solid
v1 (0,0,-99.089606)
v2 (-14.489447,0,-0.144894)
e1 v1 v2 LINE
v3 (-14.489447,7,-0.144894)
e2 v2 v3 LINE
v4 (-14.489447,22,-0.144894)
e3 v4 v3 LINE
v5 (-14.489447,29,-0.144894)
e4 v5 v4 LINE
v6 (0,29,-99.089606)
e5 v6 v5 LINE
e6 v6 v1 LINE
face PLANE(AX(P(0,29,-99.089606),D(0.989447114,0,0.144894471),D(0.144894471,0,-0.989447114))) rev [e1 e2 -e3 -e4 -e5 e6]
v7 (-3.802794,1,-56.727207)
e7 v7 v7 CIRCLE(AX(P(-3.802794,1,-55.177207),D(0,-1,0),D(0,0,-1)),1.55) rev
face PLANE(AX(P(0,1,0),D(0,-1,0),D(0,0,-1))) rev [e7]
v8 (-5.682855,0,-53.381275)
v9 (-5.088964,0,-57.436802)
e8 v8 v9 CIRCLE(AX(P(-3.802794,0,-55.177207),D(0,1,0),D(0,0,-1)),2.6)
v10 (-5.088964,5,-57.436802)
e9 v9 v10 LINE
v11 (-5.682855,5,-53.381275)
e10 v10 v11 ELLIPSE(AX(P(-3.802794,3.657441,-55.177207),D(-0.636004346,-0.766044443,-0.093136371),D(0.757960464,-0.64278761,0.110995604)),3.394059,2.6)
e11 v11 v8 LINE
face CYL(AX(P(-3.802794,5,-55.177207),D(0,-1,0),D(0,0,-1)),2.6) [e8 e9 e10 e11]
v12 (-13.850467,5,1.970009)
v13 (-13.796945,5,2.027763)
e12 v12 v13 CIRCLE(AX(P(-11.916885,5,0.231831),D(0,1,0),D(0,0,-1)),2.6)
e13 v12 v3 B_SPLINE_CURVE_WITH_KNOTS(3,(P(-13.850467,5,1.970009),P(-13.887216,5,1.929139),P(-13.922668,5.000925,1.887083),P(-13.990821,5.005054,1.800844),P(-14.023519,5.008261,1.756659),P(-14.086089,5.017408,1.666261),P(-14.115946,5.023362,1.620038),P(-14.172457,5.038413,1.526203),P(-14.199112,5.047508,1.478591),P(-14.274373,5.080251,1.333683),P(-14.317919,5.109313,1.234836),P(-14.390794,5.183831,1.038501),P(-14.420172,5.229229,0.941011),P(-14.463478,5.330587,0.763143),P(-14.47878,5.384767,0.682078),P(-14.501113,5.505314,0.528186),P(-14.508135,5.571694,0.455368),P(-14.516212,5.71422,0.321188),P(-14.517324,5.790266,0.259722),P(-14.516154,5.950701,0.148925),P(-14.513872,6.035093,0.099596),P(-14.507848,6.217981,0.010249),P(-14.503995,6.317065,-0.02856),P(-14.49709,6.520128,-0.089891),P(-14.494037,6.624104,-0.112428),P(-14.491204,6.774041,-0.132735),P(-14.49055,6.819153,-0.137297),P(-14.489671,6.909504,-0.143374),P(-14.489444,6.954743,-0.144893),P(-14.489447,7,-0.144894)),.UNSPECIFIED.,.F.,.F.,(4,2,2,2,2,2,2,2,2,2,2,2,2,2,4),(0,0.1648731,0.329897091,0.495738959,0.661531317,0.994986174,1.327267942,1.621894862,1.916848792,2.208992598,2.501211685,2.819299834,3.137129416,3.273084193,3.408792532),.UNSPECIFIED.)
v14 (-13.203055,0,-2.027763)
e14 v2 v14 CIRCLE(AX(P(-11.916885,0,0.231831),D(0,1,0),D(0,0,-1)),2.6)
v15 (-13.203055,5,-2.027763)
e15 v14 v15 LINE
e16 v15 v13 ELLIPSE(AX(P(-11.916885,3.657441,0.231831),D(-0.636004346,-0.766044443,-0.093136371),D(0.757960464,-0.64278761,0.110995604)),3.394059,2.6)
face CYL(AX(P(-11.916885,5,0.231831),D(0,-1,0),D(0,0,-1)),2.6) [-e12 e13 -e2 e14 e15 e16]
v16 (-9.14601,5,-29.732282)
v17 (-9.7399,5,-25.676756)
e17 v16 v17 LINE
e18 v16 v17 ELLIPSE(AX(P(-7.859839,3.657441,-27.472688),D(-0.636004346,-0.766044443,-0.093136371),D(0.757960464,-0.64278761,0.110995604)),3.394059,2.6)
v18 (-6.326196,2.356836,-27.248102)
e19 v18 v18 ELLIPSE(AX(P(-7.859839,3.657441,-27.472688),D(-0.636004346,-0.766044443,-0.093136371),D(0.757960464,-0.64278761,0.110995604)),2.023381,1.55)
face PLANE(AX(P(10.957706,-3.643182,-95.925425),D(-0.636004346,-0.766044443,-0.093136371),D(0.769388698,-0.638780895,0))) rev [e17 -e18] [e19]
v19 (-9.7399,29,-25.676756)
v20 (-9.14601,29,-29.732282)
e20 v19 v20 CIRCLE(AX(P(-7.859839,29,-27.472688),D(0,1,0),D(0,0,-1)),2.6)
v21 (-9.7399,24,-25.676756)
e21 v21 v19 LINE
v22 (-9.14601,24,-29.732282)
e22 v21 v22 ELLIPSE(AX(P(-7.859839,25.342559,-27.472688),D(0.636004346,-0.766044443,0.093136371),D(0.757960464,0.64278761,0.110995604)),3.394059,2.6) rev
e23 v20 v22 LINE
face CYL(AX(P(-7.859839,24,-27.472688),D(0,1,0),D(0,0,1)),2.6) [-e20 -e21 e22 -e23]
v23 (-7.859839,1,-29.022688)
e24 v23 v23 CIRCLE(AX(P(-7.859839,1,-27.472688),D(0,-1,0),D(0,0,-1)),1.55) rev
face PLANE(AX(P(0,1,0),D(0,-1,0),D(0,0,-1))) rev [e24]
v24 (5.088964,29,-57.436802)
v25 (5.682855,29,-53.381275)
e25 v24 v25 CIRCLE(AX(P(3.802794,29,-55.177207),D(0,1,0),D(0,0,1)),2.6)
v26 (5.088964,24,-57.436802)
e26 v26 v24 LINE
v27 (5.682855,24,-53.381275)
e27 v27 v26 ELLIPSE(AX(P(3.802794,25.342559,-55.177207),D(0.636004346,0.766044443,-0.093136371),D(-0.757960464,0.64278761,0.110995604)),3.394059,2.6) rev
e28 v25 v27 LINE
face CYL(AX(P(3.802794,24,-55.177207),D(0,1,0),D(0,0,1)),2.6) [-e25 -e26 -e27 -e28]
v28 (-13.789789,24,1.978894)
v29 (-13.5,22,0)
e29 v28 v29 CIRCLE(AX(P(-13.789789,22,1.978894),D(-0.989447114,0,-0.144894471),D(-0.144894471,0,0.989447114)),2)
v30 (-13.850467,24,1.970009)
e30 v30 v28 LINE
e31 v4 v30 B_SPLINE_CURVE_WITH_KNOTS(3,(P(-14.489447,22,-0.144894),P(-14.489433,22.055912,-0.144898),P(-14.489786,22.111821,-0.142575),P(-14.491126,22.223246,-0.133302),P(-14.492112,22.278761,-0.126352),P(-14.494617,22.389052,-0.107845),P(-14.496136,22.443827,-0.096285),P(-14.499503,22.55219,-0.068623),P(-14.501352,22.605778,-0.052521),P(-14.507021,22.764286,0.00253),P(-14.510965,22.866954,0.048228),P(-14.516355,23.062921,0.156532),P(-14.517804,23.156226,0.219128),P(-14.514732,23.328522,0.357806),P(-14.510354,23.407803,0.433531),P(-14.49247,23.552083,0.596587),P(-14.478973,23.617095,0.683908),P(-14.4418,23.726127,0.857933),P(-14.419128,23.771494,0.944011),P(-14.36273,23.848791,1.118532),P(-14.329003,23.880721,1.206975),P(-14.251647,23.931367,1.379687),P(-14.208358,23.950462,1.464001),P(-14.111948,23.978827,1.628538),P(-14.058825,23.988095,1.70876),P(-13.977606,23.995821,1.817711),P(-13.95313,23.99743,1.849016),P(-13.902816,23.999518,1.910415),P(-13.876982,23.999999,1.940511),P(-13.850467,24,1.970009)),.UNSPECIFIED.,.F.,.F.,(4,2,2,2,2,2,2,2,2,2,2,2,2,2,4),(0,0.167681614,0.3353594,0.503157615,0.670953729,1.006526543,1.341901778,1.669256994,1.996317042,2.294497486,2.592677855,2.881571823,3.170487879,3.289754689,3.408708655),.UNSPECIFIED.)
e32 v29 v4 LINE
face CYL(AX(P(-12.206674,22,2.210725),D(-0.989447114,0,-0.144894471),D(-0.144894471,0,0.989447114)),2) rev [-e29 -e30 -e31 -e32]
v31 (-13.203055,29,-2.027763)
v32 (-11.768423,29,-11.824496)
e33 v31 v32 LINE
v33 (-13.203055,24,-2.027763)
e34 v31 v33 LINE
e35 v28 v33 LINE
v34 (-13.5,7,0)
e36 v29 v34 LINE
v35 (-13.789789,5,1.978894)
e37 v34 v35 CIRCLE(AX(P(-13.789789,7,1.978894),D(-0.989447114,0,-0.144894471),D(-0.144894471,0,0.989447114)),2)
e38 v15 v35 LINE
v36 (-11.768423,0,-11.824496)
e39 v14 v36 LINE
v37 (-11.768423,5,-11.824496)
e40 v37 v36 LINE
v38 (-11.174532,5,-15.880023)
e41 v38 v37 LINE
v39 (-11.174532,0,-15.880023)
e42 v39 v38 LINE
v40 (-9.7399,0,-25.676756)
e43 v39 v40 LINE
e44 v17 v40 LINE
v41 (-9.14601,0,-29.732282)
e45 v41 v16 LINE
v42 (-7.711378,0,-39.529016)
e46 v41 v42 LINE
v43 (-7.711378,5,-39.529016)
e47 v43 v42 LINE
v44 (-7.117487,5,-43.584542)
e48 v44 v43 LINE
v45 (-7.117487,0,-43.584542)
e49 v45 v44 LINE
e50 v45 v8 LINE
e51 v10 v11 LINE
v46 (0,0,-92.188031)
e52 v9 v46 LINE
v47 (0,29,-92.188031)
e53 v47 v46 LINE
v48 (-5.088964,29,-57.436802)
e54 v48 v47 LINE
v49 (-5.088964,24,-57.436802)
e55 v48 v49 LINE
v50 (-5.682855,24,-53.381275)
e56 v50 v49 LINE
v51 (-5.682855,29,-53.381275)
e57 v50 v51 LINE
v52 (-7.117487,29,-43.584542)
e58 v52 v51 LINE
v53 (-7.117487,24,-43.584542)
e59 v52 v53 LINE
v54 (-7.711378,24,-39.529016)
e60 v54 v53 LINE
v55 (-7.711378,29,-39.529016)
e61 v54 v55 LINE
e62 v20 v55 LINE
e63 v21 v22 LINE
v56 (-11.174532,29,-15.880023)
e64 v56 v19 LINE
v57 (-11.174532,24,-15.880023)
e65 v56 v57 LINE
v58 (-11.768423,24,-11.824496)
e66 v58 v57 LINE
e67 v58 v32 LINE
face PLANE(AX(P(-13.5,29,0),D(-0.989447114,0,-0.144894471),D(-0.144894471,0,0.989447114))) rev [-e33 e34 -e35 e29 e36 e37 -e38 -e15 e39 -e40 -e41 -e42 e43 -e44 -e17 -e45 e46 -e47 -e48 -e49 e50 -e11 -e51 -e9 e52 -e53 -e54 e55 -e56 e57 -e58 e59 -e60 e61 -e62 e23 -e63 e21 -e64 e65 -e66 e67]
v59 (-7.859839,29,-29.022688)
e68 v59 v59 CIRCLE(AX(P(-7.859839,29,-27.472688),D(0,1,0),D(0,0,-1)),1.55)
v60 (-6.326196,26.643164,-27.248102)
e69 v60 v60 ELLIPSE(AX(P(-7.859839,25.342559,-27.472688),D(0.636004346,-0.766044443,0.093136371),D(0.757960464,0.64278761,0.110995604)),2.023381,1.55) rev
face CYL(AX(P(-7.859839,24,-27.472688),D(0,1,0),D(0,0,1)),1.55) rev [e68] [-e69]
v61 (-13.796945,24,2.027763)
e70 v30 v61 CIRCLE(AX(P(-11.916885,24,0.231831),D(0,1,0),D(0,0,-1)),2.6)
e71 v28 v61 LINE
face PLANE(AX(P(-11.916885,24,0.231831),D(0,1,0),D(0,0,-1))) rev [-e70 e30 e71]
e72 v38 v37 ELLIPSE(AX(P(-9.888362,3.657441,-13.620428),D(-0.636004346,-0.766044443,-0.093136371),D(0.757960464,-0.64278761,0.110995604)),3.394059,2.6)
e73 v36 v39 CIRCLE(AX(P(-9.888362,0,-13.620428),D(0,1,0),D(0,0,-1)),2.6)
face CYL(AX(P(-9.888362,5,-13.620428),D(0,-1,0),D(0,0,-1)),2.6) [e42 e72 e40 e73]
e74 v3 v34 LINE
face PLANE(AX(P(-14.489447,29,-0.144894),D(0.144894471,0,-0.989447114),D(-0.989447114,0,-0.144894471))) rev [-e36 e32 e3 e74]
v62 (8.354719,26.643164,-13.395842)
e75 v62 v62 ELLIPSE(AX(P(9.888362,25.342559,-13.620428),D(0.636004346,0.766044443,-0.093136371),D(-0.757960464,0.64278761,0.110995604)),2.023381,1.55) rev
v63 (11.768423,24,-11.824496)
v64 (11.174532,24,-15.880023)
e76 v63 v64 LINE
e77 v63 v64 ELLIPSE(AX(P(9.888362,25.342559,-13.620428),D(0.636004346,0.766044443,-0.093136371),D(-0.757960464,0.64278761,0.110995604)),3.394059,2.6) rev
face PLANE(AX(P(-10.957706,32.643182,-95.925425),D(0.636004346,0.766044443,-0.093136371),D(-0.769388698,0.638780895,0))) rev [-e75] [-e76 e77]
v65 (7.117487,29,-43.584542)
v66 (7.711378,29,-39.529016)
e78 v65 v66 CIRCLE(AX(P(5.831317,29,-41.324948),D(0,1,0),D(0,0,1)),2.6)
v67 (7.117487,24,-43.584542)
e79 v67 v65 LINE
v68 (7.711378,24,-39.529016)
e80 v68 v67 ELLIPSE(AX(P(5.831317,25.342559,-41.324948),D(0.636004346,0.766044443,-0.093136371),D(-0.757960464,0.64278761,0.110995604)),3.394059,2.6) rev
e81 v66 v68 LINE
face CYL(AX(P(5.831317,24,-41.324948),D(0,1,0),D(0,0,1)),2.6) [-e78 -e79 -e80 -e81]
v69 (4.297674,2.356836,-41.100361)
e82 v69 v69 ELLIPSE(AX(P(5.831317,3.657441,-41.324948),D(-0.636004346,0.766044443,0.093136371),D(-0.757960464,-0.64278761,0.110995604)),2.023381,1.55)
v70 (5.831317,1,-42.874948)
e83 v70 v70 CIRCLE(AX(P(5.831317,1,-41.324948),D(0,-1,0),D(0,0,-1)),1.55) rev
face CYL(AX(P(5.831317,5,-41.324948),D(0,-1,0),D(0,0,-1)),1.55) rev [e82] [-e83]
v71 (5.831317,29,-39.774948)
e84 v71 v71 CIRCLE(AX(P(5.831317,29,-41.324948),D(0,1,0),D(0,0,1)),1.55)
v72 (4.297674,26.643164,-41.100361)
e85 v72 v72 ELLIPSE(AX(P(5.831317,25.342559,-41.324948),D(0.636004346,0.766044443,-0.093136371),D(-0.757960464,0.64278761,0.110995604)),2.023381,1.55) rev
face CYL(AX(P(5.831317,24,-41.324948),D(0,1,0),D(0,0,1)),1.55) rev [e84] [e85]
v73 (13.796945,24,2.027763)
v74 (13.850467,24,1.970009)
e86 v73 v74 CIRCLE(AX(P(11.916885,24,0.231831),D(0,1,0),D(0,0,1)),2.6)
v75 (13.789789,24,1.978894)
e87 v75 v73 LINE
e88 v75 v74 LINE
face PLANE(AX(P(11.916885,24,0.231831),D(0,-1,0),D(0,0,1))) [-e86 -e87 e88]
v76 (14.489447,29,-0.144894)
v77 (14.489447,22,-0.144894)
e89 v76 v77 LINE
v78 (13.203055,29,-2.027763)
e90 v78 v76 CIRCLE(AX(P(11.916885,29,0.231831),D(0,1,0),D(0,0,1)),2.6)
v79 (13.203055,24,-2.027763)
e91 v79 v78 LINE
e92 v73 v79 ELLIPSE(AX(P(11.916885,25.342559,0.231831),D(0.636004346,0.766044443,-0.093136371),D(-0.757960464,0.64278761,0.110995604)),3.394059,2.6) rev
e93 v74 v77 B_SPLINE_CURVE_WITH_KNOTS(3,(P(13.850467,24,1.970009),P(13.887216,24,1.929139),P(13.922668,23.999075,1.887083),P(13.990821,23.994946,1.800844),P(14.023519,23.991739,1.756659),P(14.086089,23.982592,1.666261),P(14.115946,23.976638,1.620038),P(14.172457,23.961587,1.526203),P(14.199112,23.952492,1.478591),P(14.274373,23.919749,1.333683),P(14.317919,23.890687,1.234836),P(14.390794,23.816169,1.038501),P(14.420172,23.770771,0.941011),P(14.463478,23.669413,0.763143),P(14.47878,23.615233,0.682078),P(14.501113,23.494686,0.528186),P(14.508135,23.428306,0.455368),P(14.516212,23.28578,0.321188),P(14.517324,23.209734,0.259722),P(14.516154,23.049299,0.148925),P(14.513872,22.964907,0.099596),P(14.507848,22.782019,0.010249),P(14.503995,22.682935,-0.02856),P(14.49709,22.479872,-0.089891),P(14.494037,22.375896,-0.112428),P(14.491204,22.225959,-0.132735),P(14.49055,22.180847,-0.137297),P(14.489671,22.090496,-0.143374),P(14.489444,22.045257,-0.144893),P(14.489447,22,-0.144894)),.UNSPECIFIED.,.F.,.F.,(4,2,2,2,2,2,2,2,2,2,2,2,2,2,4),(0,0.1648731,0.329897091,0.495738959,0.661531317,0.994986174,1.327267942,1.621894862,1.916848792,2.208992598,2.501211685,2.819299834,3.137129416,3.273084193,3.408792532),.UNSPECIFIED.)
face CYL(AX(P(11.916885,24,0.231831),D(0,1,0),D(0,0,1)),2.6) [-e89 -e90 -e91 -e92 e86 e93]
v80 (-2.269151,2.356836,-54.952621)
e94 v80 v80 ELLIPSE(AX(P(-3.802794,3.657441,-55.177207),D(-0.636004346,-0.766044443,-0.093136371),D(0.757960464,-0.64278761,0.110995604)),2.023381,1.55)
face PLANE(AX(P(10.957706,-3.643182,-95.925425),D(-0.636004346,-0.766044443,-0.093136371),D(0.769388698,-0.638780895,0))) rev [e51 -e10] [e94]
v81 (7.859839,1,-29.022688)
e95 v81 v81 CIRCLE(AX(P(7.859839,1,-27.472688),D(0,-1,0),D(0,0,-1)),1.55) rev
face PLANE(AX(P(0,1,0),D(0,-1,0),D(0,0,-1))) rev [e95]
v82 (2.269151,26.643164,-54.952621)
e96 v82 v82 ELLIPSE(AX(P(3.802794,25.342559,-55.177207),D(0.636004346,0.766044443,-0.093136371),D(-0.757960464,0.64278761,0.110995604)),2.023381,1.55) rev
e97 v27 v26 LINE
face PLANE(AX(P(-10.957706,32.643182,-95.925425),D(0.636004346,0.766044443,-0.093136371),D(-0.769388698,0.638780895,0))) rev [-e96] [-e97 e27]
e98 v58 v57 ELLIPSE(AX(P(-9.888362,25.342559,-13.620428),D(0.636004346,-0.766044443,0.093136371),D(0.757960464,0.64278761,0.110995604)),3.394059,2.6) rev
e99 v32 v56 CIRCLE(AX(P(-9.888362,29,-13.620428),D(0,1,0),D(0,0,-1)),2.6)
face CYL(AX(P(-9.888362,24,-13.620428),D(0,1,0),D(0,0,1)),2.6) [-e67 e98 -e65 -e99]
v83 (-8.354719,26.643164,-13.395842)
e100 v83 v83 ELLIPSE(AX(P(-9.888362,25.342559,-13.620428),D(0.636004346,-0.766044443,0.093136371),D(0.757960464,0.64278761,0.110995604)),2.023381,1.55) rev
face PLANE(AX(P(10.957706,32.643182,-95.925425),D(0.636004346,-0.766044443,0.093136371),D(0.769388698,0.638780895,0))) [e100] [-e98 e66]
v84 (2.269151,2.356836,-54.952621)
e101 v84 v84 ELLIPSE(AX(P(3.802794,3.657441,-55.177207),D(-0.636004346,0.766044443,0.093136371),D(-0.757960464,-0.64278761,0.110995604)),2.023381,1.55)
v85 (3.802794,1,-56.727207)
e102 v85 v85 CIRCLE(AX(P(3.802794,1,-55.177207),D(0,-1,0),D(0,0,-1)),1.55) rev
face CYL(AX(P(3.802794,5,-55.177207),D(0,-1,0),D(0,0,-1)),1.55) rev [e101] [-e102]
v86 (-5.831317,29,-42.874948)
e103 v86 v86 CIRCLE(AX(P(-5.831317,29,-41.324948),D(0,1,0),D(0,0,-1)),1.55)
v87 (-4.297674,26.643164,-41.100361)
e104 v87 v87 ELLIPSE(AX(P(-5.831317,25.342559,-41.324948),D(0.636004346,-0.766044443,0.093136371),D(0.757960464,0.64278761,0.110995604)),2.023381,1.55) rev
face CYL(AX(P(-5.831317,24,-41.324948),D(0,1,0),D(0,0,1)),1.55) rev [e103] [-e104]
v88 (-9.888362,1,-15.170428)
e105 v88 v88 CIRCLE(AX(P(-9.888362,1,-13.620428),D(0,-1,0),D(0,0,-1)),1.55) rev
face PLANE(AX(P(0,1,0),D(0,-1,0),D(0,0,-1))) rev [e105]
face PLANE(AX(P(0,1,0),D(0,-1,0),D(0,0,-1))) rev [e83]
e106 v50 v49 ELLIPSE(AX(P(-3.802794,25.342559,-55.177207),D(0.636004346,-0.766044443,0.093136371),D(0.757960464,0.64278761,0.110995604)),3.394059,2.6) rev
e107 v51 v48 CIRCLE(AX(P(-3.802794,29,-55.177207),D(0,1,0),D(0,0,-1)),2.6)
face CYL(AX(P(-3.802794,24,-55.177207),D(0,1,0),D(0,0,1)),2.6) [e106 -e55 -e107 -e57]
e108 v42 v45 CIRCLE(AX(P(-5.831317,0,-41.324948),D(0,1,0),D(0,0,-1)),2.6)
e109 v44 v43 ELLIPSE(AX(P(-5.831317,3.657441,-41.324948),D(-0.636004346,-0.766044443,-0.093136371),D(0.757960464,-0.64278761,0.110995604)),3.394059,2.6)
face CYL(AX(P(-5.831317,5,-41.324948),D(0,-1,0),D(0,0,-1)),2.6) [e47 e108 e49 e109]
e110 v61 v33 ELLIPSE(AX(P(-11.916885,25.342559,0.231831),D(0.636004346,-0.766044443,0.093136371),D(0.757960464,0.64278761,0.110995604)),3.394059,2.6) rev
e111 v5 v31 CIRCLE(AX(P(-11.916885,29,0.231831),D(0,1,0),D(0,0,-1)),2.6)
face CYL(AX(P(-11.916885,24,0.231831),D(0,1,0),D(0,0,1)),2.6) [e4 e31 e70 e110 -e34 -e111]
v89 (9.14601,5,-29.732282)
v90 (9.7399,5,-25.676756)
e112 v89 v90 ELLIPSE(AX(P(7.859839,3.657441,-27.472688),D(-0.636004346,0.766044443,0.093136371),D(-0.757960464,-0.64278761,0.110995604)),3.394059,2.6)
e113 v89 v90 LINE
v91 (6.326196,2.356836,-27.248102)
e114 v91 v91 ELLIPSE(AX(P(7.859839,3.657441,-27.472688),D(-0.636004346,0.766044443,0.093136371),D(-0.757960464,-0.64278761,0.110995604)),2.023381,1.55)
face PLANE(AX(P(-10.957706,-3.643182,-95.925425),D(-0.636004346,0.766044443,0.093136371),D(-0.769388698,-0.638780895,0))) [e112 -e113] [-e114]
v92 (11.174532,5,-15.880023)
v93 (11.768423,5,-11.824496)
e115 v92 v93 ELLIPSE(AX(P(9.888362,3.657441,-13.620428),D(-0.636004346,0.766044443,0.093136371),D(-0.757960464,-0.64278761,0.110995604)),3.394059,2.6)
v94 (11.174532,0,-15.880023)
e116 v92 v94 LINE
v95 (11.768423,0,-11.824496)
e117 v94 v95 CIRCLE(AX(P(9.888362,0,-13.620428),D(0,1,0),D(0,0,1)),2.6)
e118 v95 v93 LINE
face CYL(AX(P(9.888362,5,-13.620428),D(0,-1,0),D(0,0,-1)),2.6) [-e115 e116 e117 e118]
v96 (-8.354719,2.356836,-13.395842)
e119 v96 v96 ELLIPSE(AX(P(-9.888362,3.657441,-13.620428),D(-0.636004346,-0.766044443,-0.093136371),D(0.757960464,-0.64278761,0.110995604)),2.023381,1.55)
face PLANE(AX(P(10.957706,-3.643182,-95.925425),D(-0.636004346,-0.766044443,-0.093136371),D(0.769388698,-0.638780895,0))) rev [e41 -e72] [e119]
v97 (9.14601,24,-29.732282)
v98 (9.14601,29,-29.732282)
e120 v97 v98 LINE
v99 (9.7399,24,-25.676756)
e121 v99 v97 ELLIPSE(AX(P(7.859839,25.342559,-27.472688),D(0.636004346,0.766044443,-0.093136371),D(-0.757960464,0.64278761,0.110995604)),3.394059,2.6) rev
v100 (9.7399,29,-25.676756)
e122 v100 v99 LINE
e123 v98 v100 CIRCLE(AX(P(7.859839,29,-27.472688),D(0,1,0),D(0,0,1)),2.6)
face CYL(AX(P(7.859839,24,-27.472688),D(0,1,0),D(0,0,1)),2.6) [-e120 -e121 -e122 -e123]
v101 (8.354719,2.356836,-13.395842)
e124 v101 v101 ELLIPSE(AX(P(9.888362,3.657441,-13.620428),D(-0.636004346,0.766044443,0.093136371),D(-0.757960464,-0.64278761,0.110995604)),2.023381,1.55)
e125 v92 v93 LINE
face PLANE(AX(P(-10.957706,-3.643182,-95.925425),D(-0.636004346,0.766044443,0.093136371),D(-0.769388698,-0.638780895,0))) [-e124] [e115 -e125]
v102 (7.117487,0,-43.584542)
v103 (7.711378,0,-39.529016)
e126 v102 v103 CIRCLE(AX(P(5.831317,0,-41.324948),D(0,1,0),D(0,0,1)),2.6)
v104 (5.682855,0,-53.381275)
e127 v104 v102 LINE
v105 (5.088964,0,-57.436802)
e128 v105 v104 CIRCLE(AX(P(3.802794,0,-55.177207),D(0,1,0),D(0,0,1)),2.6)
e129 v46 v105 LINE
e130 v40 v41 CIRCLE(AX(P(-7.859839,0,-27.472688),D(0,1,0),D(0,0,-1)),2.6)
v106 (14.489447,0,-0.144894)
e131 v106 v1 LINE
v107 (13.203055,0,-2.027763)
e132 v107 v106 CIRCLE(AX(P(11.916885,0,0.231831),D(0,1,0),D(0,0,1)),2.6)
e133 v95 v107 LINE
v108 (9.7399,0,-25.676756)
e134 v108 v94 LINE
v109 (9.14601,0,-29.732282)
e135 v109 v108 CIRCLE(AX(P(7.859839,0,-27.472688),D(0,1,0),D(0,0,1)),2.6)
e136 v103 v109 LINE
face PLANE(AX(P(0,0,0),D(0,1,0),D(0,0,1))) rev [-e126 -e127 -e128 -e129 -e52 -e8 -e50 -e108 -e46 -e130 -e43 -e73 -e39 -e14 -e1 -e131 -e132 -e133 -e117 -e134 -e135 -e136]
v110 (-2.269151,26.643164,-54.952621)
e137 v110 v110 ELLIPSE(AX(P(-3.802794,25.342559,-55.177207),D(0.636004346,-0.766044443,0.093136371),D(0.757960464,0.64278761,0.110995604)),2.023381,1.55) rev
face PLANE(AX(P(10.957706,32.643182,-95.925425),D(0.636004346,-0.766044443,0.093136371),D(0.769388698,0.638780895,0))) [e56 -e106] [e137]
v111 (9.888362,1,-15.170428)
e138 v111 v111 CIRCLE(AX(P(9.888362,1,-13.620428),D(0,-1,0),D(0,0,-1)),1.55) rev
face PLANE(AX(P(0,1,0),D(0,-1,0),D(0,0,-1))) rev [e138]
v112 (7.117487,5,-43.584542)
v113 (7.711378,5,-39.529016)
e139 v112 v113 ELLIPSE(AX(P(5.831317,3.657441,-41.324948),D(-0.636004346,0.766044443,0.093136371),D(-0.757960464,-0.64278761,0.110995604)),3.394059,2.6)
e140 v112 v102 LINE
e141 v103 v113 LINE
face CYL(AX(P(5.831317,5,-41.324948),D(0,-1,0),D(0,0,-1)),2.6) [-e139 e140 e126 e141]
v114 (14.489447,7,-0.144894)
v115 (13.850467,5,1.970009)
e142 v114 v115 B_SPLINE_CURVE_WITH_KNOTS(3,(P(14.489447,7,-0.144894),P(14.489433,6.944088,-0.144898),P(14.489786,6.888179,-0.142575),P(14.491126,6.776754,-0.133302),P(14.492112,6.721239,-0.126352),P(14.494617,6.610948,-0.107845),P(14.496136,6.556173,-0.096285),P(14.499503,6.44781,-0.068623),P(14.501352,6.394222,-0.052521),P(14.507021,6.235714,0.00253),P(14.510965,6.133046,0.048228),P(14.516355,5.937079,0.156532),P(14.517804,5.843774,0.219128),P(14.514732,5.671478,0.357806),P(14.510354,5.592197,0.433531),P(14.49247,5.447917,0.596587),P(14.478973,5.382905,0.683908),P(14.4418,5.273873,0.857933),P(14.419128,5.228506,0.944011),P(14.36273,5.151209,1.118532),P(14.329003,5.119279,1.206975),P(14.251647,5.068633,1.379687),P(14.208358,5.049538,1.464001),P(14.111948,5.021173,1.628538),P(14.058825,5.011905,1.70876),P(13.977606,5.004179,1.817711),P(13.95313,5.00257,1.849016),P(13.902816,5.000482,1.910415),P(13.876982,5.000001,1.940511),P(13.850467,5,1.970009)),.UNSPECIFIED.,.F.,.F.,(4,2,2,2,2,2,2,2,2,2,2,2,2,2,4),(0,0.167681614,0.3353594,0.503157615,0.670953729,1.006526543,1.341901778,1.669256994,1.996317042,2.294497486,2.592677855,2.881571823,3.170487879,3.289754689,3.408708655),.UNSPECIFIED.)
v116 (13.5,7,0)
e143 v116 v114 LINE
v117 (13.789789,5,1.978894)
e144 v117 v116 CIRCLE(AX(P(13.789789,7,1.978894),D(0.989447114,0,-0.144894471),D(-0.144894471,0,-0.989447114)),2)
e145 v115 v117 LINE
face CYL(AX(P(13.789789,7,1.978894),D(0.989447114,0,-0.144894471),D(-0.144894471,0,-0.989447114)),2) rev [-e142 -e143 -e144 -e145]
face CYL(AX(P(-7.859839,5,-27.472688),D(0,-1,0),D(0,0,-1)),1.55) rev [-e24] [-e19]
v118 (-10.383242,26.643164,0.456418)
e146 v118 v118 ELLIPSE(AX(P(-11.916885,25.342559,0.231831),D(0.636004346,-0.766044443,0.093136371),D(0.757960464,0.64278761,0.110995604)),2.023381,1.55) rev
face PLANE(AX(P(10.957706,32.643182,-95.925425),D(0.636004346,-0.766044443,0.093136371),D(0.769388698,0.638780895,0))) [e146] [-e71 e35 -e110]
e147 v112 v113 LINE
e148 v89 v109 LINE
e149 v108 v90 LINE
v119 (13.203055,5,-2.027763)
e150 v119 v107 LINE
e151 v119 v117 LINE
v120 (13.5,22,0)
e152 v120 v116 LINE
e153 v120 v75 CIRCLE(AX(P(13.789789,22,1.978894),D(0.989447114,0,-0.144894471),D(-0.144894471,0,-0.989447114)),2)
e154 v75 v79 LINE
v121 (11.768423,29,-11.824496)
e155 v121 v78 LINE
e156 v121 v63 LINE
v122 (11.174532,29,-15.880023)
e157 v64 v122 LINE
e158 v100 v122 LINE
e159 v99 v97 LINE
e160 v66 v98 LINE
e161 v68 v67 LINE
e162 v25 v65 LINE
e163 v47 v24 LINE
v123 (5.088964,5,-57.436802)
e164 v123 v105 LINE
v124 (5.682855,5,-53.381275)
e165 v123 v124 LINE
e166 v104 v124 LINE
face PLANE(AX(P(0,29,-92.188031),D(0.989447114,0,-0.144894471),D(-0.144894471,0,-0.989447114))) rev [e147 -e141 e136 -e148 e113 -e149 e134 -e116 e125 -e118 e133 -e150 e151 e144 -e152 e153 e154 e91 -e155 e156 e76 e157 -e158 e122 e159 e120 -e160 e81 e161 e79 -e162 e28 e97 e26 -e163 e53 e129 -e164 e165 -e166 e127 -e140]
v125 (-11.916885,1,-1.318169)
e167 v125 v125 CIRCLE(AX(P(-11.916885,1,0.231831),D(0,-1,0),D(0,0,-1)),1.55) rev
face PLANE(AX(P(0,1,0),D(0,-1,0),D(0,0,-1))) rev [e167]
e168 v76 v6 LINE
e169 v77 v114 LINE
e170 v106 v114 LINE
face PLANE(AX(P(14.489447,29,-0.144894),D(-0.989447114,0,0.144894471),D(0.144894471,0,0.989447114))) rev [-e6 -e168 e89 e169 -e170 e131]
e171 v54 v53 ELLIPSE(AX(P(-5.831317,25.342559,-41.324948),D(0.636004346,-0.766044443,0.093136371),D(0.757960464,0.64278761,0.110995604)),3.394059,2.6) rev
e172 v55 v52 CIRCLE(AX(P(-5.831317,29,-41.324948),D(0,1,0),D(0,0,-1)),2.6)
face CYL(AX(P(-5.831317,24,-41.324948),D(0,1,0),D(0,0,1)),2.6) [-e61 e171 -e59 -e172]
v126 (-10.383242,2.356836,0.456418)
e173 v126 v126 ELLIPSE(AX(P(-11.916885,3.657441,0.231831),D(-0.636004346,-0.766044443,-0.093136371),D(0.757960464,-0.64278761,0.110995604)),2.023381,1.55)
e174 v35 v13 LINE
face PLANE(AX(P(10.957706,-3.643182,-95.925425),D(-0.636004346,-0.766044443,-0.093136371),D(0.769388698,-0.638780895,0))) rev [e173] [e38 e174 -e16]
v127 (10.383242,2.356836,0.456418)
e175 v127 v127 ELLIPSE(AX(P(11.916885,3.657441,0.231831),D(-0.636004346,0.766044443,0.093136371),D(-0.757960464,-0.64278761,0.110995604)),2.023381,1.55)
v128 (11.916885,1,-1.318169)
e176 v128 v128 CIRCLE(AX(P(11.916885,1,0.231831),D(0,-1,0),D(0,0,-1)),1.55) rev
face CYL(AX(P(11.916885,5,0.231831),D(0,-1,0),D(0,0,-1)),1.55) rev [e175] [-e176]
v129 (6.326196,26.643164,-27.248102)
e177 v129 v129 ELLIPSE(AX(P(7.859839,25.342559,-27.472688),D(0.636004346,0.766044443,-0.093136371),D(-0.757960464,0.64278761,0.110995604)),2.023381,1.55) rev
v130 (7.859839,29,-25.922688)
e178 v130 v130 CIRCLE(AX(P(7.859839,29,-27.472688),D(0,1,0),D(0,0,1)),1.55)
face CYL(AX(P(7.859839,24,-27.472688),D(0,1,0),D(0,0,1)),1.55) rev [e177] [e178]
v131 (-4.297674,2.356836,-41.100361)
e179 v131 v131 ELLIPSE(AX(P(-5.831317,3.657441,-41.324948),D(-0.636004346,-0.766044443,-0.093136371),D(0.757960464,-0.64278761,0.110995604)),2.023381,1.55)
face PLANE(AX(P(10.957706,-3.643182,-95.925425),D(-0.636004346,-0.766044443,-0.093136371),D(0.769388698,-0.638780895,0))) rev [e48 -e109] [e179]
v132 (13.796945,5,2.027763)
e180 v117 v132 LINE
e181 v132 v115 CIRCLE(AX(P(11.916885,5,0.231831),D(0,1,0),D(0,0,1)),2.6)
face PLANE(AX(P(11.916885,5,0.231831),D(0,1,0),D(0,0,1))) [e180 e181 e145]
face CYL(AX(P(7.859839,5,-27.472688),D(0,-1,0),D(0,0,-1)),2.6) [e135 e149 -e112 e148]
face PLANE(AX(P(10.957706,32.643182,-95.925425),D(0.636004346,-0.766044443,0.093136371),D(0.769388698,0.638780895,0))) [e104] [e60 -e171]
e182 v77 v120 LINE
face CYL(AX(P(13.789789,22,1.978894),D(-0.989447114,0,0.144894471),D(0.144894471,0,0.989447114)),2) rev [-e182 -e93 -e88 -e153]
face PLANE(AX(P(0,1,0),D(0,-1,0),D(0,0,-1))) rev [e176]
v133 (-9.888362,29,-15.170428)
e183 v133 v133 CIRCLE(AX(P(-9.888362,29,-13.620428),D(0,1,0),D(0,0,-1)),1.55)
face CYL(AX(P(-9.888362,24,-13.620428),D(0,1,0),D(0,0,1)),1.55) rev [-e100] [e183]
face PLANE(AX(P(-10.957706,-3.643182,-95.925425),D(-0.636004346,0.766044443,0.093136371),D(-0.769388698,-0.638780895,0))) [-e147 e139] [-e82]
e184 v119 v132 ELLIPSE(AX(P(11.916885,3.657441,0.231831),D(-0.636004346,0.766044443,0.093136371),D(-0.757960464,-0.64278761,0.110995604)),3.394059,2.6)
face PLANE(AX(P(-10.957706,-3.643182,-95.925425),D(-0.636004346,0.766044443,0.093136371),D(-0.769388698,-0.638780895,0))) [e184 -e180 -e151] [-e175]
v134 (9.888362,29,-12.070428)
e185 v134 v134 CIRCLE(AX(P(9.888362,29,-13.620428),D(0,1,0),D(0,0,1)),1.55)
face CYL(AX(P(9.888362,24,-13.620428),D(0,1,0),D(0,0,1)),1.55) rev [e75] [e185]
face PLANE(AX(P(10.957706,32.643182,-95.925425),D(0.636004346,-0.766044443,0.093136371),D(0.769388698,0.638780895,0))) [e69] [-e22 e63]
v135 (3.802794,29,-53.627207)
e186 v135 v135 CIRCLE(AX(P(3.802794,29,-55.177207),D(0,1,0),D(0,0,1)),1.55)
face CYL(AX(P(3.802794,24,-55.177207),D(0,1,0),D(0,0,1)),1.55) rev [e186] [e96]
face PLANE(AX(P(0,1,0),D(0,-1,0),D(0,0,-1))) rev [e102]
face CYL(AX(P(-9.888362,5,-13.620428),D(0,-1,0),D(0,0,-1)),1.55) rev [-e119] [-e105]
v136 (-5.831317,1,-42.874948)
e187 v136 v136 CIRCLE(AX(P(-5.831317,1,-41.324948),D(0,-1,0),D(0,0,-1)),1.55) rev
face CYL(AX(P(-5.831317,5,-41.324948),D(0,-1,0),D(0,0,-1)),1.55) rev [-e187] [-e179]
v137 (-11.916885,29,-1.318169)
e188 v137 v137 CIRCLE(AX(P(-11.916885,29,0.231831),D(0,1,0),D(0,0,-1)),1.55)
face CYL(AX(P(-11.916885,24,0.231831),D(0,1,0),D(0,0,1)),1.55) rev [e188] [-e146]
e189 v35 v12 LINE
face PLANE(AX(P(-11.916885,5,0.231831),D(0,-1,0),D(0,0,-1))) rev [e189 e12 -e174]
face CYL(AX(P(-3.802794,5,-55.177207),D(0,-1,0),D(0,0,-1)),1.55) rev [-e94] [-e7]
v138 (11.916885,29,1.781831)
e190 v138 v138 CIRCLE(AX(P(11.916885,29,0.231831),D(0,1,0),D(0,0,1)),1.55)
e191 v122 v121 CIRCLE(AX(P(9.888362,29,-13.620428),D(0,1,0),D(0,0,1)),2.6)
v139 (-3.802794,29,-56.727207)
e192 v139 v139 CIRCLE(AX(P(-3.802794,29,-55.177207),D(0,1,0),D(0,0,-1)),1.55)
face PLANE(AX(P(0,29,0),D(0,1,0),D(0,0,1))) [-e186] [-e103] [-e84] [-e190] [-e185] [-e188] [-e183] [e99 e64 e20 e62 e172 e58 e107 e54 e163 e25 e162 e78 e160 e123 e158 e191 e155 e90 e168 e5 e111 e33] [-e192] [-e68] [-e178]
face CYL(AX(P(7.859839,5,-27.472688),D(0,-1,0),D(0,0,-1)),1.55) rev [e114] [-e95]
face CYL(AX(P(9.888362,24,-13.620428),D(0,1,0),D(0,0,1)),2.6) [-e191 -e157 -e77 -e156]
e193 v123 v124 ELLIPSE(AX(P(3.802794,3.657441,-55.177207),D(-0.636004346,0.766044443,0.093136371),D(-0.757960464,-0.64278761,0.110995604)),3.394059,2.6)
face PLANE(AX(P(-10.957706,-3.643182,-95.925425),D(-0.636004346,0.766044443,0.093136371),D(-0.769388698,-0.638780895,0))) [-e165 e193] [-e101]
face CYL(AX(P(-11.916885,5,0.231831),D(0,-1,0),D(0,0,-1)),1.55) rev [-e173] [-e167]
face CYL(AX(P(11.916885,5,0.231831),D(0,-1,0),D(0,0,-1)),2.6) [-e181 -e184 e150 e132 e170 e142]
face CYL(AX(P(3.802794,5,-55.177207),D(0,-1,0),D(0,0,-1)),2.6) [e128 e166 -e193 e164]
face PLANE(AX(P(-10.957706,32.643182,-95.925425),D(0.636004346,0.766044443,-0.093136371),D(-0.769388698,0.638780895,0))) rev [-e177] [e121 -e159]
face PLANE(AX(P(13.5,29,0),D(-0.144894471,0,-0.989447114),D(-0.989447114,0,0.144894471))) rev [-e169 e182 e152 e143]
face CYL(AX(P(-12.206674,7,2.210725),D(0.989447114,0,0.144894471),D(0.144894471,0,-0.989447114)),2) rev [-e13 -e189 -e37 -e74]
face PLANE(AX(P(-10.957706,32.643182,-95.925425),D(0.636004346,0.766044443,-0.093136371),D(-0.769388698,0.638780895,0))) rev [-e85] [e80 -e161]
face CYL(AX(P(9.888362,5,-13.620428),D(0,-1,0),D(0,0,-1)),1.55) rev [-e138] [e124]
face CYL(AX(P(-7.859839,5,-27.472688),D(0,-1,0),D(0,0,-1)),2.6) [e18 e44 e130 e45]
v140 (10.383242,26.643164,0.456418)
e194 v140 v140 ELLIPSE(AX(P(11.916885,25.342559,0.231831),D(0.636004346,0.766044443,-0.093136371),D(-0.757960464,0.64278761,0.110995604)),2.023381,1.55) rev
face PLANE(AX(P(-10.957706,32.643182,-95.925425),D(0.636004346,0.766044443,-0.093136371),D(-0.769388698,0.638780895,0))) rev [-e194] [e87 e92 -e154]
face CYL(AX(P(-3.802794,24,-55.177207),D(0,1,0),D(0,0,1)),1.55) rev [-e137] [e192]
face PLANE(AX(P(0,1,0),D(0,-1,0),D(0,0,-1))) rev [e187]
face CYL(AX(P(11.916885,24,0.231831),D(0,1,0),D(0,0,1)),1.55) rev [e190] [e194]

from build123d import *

# Parameters (mm, degrees)
BOSS_EXTRUDE1_DEPTH            = 29
SKETCH2_R                      = 2.6
SKETCH2_R_2                    = 1.55
BOSS_EXTRUDE3_DEPTH            = 5
CUT_EXTRUDE1_REACH             = 108.142
CUT_EXTRUDE1_DIRECTION_2_DEPTH = 107.141922264
CUT_EXTRUDE2_REACH             = 108.142
CUT_EXTRUDE2_DIRECTION_2_DEPTH = 107.141922264
FILLET1_R                      = 2
SKETCH6_R                      = 1.55
BOSS_EXTRUDE4_DEPTH            = 1


with BuildPart() as part:
    # Sketch1 → Boss-Extrude1 (new body)
    with BuildSketch(Plane(origin=(0, 0, 0), x_dir=(1, 0, 0), z_dir=(0, 1, 0))):
        Polygon((-13.5, 0), (0, 92.188031325), (13.5, 0), (14.489447114, 0.144894471), (0, 99.089605913), (-14.489447114, 0.144894471), align=None)
    extrude(amount=BOSS_EXTRUDE1_DEPTH)

    # Sketch2 → Boss-Extrude3 (add)
    # profile 1 of 10: a face of its own
    with BuildSketch(Plane(origin=(0, 0, 0), x_dir=(1, 0, 0), z_dir=(0, 1, 0))):
        with Locations((11.916884617, -0.231831154)):
            Circle(SKETCH2_R)
        with Locations(Location((11.916884617, -0.231831154, 0), (0, 0, 270))):
            Circle(SKETCH2_R_2, mode=Mode.SUBTRACT)
    # profile 2 of 10: a face of its own
    with BuildSketch(Plane(origin=(0, 0, 0), x_dir=(1, 0, 0), z_dir=(0, 1, 0))):
        with Locations((9.888362021, 13.620428448)):
            Circle(SKETCH2_R)
        with Locations(Location((9.888362021, 13.620428448, 0), (0, 0, 270))):
            Circle(SKETCH2_R_2, mode=Mode.SUBTRACT)
    # profile 3 of 10: a face of its own
    with BuildSketch(Plane(origin=(0, 0, 0), x_dir=(1, 0, 0), z_dir=(0, 1, 0))):
        with Locations((7.859839425, 27.47268805)):
            Circle(SKETCH2_R)
        with Locations(Location((7.859839425, 27.47268805, 0), (0, 0, 270))):
            Circle(SKETCH2_R_2, mode=Mode.SUBTRACT)
    # profile 4 of 10: a face of its own
    with BuildSketch(Plane(origin=(0, 0, 0), x_dir=(1, 0, 0), z_dir=(0, 1, 0))):
        with Locations((5.831316829, 41.324947652)):
            Circle(SKETCH2_R)
        with Locations(Location((5.831316829, 41.324947652, 0), (0, 0, 270))):
            Circle(SKETCH2_R_2, mode=Mode.SUBTRACT)
    # profile 5 of 10: a face of its own
    with BuildSketch(Plane(origin=(0, 0, 0), x_dir=(1, 0, 0), z_dir=(0, 1, 0))):
        with Locations((3.802794233, 55.177207254)):
            Circle(SKETCH2_R)
        with Locations(Location((3.802794233, 55.177207254, 0), (0, 0, 270))):
            Circle(SKETCH2_R_2, mode=Mode.SUBTRACT)
    # profile 6 of 10: a face of its own
    with BuildSketch(Plane(origin=(0, 0, 0), x_dir=(1, 0, 0), z_dir=(0, 1, 0))):
        with Locations((-11.916884617, -0.231831154)):
            Circle(SKETCH2_R)
        with Locations(Location((-11.916884617, -0.231831154, 0), (0, 0, 90))):
            Circle(SKETCH2_R_2, mode=Mode.SUBTRACT)
    # profile 7 of 10: a face of its own
    with BuildSketch(Plane(origin=(0, 0, 0), x_dir=(1, 0, 0), z_dir=(0, 1, 0))):
        with Locations((-9.888362021, 13.620428448)):
            Circle(SKETCH2_R)
        with Locations(Location((-9.888362021, 13.620428448, 0), (0, 0, 90))):
            Circle(SKETCH2_R_2, mode=Mode.SUBTRACT)
    # profile 8 of 10: a face of its own
    with BuildSketch(Plane(origin=(0, 0, 0), x_dir=(1, 0, 0), z_dir=(0, 1, 0))):
        with Locations((-7.859839425, 27.47268805)):
            Circle(SKETCH2_R)
        with Locations(Location((-7.859839425, 27.47268805, 0), (0, 0, 90))):
            Circle(SKETCH2_R_2, mode=Mode.SUBTRACT)
    # profile 9 of 10: a face of its own
    with BuildSketch(Plane(origin=(0, 0, 0), x_dir=(1, 0, 0), z_dir=(0, 1, 0))):
        with Locations((-5.831316829, 41.324947652)):
            Circle(SKETCH2_R)
        with Locations(Location((-5.831316829, 41.324947652, 0), (0, 0, 90))):
            Circle(SKETCH2_R_2, mode=Mode.SUBTRACT)
    # profile 10 of 10: a face of its own
    with BuildSketch(Plane(origin=(0, 0, 0), x_dir=(1, 0, 0), z_dir=(0, 1, 0))):
        with Locations((-3.802794233, 55.177207254)):
            Circle(SKETCH2_R)
        with Locations(Location((-3.802794233, 55.177207254, 0), (0, 0, 90))):
            Circle(SKETCH2_R_2, mode=Mode.SUBTRACT)
    boss_extrude3 = extrude(amount=BOSS_EXTRUDE3_DEPTH)

    # Cut-Extrude1: up to this face of the body (flat: up to its plane)
    cut_extrude1_end = Plane(part.part.faces().sort_by_distance((-6.671349584, 14.924053366, -46.631099147))[0])
    # Sketch4 → Cut-Extrude1 (cut, up to the picked face)
    with BuildSketch(Plane(origin=(0.283424505, 0, 1.935433121), x_dir=(0.9894471144188783, 0, -0.14489447114419254), z_dir=(0.14489447114419252, 0, 0.9894471144188782)), mode=Mode.PRIVATE) as cut_extrude1_sk1:
        Polygon((13.357536045, 5), (9.157536045, 5), (9.157536045, 1.475781549), align=None)
    cut_extrude1_tool1 = split(extrude(cut_extrude1_sk1.sketch, amount=-CUT_EXTRUDE1_REACH, mode=Mode.PRIVATE), bisect_by=cut_extrude1_end, keep=Keep.BOTH, mode=Mode.PRIVATE)
    cut_extrude1 = cut_extrude1_tool1.solids().sort_by(Axis((10.729548, 3.825261, 0.405705), (-0.14489447114419252, 0, -0.9894471144188782)))[0]
    add(cut_extrude1, mode=Mode.SUBTRACT)

    # Sketch4 → Cut-Extrude1 direction 2 (cut)
    with BuildSketch(Plane(origin=(0.283424505, 0, 1.935433121), x_dir=(0.9894471144188783, 0, -0.14489447114419254), z_dir=(0.14489447114419252, 0, 0.9894471144188782))):
        Polygon((13.357536045, 5), (9.157536045, 5), (9.157536045, 1.475781549), align=None)
    cut_extrude1_direction_2 = extrude(amount=CUT_EXTRUDE1_DIRECTION_2_DEPTH, mode=Mode.SUBTRACT)

    # Cut-Extrude2: up to this face of the body (flat: up to its plane)
    cut_extrude2_end = Plane(part.part.faces().sort_by_distance((6.671349584, 14.924053366, -46.631099147))[0])
    # Sketch5 → Cut-Extrude2 (cut, up to the picked face)
    with BuildSketch(Plane(origin=(-0.283424505, 0, 1.935433121), x_dir=(0.9894471144188784, 0, 0.14489447114419146), z_dir=(-0.14489447114419146, 0, 0.9894471144188784)), mode=Mode.PRIVATE) as cut_extrude2_sk1:
        Polygon((-9.157536045, 5), (-9.157536045, 1.475781549), (-13.357536045, 5), align=None)
    cut_extrude2_tool1 = split(extrude(cut_extrude2_sk1.sketch, amount=-CUT_EXTRUDE2_REACH, mode=Mode.PRIVATE), bisect_by=cut_extrude2_end, keep=Keep.BOTH, mode=Mode.PRIVATE)
    cut_extrude2 = cut_extrude2_tool1.solids().sort_by(Axis((-10.729548, 3.825261, 0.405705), (0.14489447114419146, 0, -0.9894471144188784)))[0]
    add(cut_extrude2, mode=Mode.SUBTRACT)

    # Sketch5 → Cut-Extrude2 direction 2 (cut)
    with BuildSketch(Plane(origin=(-0.283424505, 0, 1.935433121), x_dir=(0.9894471144188784, 0, 0.14489447114419146), z_dir=(-0.14489447114419146, 0, 0.9894471144188784))):
        Polygon((-9.157536045, 5), (-9.157536045, 1.475781549), (-13.357536045, 5), align=None)
    cut_extrude2_direction_2 = extrude(amount=CUT_EXTRUDE2_DIRECTION_2_DEPTH, mode=Mode.SUBTRACT)

    # Mirror2: Boss-Extrude3, Cut-Extrude1, Cut-Extrude1 direction 2, Cut-Extrude2, Cut-Extrude2 direction 2 across plane
    add(boss_extrude3.mirror(Plane.ZX.offset(14.5)))
    add(cut_extrude1.mirror(Plane.ZX.offset(14.5)), mode=Mode.SUBTRACT)
    add(cut_extrude1_direction_2.mirror(Plane.ZX.offset(14.5)), mode=Mode.SUBTRACT)
    add(cut_extrude2.mirror(Plane.ZX.offset(14.5)), mode=Mode.SUBTRACT)
    add(cut_extrude2_direction_2.mirror(Plane.ZX.offset(14.5)), mode=Mode.SUBTRACT)

    # Fillet1
    # the kernel refuses this fillet: 2 mm, written as the material it adds along each edge
    with BuildSketch(Plane(origin=(13.5, 5, 0), x_dir=(0, 1, 0), z_dir=(0.9894471144188783, 0, -0.1448944711441925))) as fillet1_piece_1_section:
        with BuildLine():
            CenterArc((FILLET1_R, FILLET1_R), FILLET1_R, 180, 90)
            Line((0, FILLET1_R), (0, 0))
            Line((0, 0), (FILLET1_R, 0))
        make_face()
    fillet1_piece_1 = extrude(amount=6, mode=Mode.PRIVATE)
    fillet1_piece_1 = fillet1_piece_1 & Plane(origin=(11.916884617, 5.699977741, 0.231831154), x_dir=(1, 0, 0), z_dir=(0, -1, 0)) * Cylinder(2.6, 20, mode=Mode.PRIVATE)
    add(fillet1_piece_1)
    with BuildSketch(Plane(origin=(13.5, 24, 0), x_dir=(0, -1, 0), z_dir=(0.9894471144188783, 0, -0.1448944711441925))) as fillet1_piece_2_section:
        with BuildLine():
            CenterArc((FILLET1_R, -FILLET1_R), FILLET1_R, 90, 90)
            Line((0, -FILLET1_R), (0, 0))
            Line((0, 0), (FILLET1_R, 0))
        make_face()
    fillet1_piece_2 = extrude(amount=6, mode=Mode.PRIVATE)
    fillet1_piece_2 = fillet1_piece_2 & Plane(origin=(11.916884617, 23.30002226, 0.231831154), x_dir=(1, 0, 0), z_dir=(0, 1, 0)) * Cylinder(2.6, 20, mode=Mode.PRIVATE)
    add(fillet1_piece_2)
    with BuildSketch(Plane(origin=(-19.436682687, 24, -0.869366827), x_dir=(0, -1, 0), z_dir=(0.9894471144188784, 0, 0.1448944711441914))) as fillet1_piece_3_section:
        with BuildLine():
            CenterArc((FILLET1_R, -FILLET1_R), FILLET1_R, 90, 90)
            Line((0, -FILLET1_R), (0, 0))
            Line((0, 0), (FILLET1_R, 0))
        make_face()
    fillet1_piece_3 = extrude(amount=6, mode=Mode.PRIVATE)
    fillet1_piece_3 = fillet1_piece_3 & Plane(origin=(-11.916884617, 23.777637105, 0.231831154), x_dir=(1, 0, 0), z_dir=(0, 1, 0)) * Cylinder(2.6, 21, mode=Mode.PRIVATE)
    add(fillet1_piece_3)
    with BuildSketch(Plane(origin=(-19.436682687, 5, -0.869366827), x_dir=(-0.1448944711441914, 0, 0.9894471144188784), z_dir=(0.9894471144188784, 0, 0.1448944711441914))) as fillet1_piece_4_section:
        with BuildLine():
            CenterArc((FILLET1_R, -FILLET1_R), FILLET1_R, 90, 90)
            Line((0, -FILLET1_R), (0, 0))
            Line((0, 0), (FILLET1_R, 0))
        make_face()
    fillet1_piece_4 = extrude(amount=6, mode=Mode.PRIVATE)
    fillet1_piece_4 = fillet1_piece_4 & Plane(origin=(-11.916884617, 5.222362792, 0.231831154), x_dir=(1, 0, 0), z_dir=(0, -1, 0)) * Cylinder(2.6, 21, mode=Mode.PRIVATE)
    add(fillet1_piece_4)

    # Sketch6 → Boss-Extrude4 (add)
    with BuildSketch(Plane.XZ):
        with Locations(Location((3.802794233, -55.177207254, 0), (0, 0, 270))):
            Circle(SKETCH6_R)
        with Locations(Location((-3.802794233, -55.177207254, 0), (0, 0, 270))):
            Circle(SKETCH6_R)
        with Locations(Location((-5.831316829, -41.324947652, 0), (0, 0, 270))):
            Circle(SKETCH6_R)
        with Locations(Location((5.831316829, -41.324947652, 0), (0, 0, 270))):
            Circle(SKETCH6_R)
        with Locations(Location((7.859839425, -27.47268805, 0), (0, 0, 270))):
            Circle(SKETCH6_R)
        with Locations(Location((-7.859839425, -27.47268805, 0), (0, 0, 270))):
            Circle(SKETCH6_R)
        with Locations(Location((-9.888362021, -13.620428448, 0), (0, 0, 270))):
            Circle(SKETCH6_R)
        with Locations(Location((9.888362021, -13.620428448, 0), (0, 0, 270))):
            Circle(SKETCH6_R)
        with Locations(Location((11.916884617, 0.231831154, 0), (0, 0, 270))):
            Circle(SKETCH6_R)
        with Locations(Location((-11.916884617, 0.231831154, 0), (0, 0, 270))):
            Circle(SKETCH6_R)
    extrude(amount=-BOSS_EXTRUDE4_DEPTH)


solid = part.part
